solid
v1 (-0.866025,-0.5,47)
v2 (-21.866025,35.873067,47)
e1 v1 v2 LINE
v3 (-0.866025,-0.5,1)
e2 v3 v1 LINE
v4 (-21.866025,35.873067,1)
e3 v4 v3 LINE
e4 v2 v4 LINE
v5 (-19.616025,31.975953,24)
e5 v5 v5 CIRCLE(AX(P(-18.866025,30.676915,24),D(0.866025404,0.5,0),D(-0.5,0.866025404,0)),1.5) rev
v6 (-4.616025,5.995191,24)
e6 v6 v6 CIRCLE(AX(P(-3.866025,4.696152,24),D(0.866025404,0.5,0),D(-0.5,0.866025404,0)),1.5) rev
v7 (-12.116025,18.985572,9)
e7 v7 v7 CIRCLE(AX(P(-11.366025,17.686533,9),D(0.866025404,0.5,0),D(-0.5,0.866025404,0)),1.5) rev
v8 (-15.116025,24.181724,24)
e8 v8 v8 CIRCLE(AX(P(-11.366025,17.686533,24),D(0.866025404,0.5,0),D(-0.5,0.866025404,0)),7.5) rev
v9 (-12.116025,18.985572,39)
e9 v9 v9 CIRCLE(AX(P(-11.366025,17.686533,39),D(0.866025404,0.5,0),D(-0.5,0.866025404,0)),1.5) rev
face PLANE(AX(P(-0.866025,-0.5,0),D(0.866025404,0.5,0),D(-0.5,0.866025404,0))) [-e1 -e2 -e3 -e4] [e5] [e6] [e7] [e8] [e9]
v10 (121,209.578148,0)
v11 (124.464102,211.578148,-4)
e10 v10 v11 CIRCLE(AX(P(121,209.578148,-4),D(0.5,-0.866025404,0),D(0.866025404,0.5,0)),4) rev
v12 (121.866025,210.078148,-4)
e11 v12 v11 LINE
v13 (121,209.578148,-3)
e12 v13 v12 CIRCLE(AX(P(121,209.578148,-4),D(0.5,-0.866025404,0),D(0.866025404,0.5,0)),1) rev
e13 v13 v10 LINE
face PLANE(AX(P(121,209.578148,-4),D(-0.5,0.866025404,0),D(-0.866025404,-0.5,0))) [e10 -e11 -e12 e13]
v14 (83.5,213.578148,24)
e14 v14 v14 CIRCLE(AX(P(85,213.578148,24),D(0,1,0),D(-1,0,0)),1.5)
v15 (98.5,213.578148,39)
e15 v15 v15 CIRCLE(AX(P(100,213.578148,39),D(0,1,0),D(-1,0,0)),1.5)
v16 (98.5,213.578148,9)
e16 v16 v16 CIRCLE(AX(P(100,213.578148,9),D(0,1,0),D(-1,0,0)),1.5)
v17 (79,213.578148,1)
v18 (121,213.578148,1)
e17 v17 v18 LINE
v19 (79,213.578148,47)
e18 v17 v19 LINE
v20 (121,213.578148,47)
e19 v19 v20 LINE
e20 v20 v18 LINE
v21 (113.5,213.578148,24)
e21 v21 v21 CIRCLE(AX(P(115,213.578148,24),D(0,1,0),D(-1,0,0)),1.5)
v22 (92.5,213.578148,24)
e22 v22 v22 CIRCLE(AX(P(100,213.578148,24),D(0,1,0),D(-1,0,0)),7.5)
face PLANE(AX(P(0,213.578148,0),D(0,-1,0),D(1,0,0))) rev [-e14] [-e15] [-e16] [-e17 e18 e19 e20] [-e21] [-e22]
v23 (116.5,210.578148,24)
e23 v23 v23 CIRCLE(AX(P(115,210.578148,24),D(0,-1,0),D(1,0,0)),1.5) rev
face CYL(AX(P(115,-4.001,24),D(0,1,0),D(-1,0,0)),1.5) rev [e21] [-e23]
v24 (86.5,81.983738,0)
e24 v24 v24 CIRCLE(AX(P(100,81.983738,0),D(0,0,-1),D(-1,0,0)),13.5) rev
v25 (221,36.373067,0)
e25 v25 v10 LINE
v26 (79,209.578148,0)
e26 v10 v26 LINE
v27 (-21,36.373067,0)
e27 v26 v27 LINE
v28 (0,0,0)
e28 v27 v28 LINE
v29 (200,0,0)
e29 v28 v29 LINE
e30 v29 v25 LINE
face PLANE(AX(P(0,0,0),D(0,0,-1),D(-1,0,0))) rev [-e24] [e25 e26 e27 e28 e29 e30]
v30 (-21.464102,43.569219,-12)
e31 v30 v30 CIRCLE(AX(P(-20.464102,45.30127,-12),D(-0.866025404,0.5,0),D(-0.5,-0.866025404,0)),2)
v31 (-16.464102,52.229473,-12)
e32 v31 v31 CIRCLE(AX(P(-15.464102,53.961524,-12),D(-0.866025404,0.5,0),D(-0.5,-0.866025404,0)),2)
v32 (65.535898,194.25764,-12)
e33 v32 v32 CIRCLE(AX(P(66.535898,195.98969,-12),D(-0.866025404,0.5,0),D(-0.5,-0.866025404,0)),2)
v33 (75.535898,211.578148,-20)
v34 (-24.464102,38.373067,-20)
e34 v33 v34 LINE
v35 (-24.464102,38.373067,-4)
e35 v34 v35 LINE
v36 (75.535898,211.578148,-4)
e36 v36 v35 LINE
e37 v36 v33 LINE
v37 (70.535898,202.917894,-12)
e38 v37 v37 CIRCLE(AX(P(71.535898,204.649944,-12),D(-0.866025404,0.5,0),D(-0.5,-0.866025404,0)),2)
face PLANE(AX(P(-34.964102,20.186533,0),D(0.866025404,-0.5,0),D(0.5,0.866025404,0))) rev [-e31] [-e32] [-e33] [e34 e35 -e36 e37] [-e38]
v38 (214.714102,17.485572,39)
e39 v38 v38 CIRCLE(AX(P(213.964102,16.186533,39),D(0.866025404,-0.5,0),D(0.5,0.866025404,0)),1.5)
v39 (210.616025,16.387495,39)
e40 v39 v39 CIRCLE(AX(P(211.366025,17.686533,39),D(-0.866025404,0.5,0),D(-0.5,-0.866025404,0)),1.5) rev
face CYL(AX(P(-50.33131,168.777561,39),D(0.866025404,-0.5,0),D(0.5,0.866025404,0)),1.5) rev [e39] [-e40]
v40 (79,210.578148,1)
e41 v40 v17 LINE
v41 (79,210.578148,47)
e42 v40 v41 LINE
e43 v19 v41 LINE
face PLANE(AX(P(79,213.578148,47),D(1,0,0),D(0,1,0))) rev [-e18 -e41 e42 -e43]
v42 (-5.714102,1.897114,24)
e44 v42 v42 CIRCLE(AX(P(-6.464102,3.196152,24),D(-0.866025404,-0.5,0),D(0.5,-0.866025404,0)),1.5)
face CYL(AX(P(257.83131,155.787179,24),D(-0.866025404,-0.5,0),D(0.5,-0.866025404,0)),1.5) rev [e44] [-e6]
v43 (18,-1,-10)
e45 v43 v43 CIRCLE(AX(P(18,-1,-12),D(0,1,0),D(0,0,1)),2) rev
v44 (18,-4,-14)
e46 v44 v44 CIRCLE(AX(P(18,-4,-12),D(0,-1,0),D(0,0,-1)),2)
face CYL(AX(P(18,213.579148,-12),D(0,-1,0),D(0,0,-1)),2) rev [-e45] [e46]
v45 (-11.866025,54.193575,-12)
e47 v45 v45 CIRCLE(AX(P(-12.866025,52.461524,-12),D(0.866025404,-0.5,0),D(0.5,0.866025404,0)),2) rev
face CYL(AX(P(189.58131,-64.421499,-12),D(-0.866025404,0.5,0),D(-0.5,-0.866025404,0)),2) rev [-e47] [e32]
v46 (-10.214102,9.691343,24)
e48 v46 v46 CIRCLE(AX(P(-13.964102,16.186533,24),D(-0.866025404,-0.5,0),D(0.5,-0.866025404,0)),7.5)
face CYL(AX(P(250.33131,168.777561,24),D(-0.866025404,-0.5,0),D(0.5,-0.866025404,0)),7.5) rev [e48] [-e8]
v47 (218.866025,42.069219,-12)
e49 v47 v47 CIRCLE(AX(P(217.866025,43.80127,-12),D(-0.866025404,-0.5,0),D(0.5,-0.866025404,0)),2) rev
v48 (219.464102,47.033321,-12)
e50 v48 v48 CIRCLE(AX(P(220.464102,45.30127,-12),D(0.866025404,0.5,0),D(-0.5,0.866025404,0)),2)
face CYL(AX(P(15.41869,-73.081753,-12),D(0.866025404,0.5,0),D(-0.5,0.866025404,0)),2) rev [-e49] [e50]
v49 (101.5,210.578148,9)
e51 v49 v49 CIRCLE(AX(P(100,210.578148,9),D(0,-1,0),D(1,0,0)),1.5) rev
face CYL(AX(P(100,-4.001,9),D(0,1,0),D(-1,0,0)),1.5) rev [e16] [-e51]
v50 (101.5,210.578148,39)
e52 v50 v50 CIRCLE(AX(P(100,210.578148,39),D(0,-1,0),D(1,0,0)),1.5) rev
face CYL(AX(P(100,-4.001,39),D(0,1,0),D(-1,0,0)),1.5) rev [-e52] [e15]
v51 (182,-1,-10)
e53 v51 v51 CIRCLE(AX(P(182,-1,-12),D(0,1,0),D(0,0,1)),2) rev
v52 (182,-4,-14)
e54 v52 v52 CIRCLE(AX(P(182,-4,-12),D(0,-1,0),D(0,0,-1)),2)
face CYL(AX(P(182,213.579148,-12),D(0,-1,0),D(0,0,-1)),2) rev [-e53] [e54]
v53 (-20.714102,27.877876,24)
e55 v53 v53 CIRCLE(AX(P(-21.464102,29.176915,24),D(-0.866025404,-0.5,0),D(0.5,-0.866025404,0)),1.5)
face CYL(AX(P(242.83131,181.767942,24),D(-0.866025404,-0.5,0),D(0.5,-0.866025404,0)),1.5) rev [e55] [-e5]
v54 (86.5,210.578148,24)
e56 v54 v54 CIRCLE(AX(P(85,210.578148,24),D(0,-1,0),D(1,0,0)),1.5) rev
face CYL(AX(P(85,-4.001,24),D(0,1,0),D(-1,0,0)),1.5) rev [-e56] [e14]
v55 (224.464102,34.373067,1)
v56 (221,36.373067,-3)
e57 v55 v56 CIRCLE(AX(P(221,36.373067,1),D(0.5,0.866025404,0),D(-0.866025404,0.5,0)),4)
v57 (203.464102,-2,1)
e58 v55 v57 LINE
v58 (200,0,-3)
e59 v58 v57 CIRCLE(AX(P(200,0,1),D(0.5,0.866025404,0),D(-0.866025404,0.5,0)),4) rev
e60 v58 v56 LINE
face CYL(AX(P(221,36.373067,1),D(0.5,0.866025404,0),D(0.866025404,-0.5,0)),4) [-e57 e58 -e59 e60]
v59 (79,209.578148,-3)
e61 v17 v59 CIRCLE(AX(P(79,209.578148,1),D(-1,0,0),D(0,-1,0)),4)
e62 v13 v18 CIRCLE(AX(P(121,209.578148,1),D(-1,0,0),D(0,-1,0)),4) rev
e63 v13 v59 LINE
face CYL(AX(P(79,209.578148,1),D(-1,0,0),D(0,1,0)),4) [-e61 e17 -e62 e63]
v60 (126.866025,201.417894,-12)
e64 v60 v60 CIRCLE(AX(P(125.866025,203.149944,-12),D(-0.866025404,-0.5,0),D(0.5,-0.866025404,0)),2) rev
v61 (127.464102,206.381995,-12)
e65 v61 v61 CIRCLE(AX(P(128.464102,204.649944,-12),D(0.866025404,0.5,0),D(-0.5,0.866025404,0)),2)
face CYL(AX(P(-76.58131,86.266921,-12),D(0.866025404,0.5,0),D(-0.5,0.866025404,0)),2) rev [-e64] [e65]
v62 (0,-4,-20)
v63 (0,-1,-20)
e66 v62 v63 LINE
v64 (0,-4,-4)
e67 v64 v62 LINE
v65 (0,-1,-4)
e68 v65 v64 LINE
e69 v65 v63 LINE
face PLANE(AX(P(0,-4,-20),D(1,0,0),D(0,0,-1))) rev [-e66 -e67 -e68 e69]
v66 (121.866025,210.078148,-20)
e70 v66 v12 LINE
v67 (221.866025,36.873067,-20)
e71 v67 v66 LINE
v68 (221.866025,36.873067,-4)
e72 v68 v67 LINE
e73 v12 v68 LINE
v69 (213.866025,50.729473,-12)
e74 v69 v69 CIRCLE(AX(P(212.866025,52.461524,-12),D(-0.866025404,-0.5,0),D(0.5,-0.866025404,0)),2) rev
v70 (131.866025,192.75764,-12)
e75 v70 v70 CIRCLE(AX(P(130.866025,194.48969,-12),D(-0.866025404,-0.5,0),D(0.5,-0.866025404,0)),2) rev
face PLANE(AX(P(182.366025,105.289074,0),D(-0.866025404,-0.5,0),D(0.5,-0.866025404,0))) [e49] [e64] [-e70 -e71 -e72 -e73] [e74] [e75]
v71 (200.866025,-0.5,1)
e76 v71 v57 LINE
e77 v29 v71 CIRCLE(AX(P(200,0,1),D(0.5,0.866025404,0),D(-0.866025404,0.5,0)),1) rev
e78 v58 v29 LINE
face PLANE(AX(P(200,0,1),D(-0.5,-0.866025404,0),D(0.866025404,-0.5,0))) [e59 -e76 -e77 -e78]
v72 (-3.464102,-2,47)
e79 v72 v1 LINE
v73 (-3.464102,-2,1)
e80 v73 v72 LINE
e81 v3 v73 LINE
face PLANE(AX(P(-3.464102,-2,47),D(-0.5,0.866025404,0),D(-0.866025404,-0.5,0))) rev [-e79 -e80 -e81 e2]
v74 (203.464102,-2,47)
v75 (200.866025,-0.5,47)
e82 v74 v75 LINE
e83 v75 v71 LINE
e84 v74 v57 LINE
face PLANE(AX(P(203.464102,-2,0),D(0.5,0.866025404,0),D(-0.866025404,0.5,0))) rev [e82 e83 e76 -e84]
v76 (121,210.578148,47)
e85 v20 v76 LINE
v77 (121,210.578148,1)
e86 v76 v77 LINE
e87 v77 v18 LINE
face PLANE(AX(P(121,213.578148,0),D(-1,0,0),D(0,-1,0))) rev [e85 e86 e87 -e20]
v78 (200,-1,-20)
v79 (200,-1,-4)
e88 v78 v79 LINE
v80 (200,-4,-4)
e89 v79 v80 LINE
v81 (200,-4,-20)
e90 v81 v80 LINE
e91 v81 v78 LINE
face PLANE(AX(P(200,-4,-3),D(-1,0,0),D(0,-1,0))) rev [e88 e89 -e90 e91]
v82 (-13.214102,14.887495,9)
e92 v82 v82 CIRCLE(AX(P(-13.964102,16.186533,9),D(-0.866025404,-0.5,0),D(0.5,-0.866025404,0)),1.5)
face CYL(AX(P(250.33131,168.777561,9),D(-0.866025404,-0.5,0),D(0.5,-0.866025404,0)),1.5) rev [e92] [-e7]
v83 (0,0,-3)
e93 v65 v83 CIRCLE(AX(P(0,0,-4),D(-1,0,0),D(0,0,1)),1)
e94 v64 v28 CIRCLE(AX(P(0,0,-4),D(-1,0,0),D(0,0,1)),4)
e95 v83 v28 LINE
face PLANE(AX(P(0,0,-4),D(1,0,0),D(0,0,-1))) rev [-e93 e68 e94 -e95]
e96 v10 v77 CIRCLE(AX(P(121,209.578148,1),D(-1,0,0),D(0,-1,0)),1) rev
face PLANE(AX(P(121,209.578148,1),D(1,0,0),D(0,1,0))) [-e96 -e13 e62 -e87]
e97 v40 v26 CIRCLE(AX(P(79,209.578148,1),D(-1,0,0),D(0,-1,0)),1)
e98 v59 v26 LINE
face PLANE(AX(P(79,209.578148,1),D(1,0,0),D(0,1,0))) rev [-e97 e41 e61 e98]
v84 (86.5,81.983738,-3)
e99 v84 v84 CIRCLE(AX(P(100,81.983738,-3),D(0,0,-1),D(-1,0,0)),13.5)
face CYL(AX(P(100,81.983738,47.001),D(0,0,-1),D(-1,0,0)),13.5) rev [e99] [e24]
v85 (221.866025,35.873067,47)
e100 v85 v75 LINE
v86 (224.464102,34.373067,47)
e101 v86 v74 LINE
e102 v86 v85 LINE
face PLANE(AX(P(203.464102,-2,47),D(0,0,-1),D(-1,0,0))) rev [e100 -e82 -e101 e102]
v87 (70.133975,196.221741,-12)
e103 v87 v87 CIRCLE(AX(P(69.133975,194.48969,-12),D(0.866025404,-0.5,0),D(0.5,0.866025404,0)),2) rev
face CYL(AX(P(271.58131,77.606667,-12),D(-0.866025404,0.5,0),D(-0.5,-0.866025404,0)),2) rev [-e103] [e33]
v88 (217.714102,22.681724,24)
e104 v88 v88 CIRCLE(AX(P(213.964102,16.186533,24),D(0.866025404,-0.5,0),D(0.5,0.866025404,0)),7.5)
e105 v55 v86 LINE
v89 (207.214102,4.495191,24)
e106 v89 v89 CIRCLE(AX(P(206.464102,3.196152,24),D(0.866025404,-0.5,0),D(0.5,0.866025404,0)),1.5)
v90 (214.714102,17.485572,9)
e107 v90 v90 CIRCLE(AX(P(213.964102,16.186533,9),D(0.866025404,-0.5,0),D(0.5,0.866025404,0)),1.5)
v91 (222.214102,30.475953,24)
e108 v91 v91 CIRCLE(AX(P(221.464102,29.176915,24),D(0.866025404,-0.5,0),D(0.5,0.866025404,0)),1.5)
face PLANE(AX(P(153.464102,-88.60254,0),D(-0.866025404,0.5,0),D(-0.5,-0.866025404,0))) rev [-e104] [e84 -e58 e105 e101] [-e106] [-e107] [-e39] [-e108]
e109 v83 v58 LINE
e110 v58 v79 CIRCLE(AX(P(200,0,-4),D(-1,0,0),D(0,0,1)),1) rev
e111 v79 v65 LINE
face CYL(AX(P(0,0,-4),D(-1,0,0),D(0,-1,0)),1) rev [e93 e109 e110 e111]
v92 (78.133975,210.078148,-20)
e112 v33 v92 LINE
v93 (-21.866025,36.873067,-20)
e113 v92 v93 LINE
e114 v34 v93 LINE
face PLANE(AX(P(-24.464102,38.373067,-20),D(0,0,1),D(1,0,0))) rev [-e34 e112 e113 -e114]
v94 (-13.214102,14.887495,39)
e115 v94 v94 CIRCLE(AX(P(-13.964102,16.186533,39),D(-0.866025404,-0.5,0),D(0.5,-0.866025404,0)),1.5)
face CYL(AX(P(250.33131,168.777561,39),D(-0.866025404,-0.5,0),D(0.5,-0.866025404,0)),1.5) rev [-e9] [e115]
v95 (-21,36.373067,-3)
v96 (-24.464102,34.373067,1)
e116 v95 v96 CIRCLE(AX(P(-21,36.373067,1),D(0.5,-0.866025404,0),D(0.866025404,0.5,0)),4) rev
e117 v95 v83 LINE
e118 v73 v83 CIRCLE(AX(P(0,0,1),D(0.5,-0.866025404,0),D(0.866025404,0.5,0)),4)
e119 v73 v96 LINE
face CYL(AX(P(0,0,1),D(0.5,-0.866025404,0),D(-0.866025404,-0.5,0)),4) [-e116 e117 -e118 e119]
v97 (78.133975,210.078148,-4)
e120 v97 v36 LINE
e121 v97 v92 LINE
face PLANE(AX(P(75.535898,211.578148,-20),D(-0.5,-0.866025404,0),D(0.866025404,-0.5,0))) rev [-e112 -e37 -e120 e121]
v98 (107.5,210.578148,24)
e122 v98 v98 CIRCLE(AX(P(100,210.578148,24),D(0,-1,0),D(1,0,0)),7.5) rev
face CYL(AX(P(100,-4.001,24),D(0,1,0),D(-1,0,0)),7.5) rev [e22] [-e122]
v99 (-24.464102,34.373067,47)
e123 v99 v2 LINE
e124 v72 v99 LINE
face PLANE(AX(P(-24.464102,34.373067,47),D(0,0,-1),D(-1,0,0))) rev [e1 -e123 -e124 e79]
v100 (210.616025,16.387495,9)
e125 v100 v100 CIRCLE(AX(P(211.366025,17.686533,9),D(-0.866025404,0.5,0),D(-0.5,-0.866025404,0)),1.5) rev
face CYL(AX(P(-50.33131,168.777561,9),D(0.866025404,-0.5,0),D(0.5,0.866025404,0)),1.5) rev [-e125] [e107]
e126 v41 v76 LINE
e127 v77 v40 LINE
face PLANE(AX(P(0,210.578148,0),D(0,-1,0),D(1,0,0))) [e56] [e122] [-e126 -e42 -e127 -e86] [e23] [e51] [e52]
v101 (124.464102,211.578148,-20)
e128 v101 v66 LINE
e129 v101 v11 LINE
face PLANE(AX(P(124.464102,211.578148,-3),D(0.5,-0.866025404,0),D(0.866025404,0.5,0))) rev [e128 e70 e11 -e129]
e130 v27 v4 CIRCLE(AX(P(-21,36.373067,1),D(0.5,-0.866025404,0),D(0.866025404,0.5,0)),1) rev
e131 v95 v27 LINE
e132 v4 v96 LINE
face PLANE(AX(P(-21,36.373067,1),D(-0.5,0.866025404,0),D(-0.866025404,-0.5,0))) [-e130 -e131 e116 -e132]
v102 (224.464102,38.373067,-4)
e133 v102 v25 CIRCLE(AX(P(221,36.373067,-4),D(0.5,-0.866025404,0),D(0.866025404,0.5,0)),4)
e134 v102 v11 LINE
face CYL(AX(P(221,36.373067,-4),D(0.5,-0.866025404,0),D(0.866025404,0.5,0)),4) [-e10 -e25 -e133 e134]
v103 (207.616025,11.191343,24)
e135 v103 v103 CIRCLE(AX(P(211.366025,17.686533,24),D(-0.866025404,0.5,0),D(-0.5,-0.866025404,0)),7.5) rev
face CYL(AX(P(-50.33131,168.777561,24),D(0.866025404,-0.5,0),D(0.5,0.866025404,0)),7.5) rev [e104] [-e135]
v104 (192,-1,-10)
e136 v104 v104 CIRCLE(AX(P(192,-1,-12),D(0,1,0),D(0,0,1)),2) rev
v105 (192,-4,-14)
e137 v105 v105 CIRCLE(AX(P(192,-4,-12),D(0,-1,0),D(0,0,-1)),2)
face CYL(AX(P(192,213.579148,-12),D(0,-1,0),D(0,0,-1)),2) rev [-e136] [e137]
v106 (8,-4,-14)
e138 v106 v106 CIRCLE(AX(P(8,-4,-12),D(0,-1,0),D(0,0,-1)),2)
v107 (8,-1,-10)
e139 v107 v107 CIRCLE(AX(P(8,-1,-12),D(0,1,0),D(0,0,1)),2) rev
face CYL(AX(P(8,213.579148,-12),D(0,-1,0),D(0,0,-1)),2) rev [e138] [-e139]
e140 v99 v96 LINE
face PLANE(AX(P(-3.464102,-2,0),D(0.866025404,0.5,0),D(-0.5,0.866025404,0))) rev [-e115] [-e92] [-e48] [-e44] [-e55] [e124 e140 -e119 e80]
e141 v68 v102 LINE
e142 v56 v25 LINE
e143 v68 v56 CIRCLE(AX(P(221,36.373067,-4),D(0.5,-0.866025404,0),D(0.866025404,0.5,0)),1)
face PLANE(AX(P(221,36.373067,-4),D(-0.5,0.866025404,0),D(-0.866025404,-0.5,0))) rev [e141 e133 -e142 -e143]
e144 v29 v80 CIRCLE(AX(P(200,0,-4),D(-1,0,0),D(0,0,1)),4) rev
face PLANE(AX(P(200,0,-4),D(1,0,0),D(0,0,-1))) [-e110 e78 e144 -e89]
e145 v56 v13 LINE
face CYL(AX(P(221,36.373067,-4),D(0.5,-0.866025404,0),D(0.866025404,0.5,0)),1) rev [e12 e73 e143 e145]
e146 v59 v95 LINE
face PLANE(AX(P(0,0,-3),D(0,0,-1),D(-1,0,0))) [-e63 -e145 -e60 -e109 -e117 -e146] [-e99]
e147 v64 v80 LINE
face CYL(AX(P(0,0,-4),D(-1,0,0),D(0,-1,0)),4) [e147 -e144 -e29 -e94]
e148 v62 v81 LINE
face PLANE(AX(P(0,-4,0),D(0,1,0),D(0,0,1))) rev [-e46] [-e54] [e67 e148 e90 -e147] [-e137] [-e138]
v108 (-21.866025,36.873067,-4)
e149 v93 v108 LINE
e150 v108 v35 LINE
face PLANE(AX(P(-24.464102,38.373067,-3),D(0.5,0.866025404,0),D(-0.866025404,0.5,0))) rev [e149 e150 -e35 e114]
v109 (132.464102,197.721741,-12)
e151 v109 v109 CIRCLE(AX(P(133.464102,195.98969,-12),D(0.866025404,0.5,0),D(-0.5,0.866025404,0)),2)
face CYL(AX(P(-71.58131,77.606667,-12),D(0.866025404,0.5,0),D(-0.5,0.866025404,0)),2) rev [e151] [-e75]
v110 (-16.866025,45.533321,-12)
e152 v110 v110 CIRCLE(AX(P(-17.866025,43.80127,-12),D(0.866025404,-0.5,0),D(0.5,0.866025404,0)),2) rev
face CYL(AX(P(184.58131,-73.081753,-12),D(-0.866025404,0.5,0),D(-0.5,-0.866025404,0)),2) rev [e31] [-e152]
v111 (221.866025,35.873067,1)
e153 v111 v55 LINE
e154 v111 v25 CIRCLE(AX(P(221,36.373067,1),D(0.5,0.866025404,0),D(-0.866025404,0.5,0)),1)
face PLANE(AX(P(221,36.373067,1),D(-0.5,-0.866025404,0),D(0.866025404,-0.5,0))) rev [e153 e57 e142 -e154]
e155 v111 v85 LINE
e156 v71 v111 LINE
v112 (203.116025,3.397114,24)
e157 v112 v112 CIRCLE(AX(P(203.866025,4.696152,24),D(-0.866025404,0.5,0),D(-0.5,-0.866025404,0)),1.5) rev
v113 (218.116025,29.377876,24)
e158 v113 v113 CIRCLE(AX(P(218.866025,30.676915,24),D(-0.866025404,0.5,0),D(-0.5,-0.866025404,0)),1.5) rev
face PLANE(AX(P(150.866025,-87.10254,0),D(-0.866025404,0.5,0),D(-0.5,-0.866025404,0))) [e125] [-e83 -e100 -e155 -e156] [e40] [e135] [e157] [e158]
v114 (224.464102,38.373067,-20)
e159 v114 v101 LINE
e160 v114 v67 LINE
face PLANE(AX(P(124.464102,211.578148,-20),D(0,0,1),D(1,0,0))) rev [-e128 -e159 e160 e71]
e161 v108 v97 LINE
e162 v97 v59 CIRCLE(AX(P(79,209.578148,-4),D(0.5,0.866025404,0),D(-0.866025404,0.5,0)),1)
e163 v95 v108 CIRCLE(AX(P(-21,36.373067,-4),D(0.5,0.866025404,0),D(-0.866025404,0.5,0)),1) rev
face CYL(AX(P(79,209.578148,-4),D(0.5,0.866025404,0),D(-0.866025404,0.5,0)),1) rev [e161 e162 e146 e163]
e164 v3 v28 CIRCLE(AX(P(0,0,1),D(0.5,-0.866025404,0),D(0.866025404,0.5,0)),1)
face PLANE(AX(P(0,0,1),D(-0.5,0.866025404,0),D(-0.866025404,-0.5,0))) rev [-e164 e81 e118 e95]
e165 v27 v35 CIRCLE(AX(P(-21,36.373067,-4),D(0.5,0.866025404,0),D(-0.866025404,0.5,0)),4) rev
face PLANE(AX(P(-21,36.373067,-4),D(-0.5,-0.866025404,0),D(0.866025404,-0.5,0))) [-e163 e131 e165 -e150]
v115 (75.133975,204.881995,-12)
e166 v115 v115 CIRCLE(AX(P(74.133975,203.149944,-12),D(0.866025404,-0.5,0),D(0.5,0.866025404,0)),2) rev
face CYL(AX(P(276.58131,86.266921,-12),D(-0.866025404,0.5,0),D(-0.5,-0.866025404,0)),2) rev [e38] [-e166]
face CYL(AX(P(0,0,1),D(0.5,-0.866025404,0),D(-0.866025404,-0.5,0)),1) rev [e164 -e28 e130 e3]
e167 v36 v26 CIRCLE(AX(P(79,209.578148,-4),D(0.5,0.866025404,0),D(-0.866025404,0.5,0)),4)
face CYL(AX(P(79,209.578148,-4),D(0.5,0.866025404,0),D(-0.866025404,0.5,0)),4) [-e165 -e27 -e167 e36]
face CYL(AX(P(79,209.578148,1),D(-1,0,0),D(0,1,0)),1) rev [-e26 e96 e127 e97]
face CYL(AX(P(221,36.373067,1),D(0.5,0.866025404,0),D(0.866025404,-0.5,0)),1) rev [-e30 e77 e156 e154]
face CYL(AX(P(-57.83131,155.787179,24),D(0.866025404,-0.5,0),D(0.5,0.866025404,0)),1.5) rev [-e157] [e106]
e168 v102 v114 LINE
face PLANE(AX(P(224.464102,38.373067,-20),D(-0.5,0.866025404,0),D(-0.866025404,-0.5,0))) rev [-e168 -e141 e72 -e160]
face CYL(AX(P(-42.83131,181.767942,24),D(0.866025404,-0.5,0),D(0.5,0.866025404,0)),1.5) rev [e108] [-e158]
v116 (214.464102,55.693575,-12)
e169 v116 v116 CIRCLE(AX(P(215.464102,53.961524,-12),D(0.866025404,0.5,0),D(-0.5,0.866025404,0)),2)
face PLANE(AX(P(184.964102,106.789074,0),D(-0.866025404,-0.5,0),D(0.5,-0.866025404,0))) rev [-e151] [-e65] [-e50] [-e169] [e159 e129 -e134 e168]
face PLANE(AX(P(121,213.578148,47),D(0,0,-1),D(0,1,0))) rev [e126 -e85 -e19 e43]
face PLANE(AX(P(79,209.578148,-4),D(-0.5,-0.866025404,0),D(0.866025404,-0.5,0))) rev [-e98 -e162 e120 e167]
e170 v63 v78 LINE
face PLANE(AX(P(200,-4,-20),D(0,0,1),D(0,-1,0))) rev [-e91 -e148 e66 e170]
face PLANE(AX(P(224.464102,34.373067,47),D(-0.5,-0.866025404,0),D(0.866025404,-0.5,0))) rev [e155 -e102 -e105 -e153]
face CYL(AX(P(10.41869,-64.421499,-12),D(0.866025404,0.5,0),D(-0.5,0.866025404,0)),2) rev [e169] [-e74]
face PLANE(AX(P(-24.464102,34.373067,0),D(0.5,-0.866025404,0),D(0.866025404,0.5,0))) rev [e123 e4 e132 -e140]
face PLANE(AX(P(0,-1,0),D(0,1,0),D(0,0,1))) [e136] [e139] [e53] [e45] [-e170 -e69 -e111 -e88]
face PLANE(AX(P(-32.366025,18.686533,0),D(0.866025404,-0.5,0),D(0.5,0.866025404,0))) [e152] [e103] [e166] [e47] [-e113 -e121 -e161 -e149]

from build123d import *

# Parameters (mm, degrees)
SM_BASE_FLANGE_3_DEPTH        = 3
SM_EDGE_FLANGE_2_DEPTH        = 42
SM_EDGE_FLANGE_2_BEND_DEPTH   = 42
SM_EDGE_FLANGE_2_BEND_2_DEPTH = 42
SM_EDGE_FLANGE_6_DEPTH        = 200
SM_EDGE_FLANGE_6_BEND_DEPTH   = 200
SM_EDGE_FLANGE_6_BEND_2_DEPTH = 200
CUT_EXTRUDE_3_REACH           = 318.122
SKETCH_42_R                   = 7.5
SKETCH_42_R_2                 = 1.5
CUT_EXTRUDE_2_REACH           = 355.809
SKETCH_43_R                   = 7.5
SKETCH_43_R_2                 = 1.5
CUT_EXTRUDE_1_REACH           = 319.229
SKETCH_44_R                   = 7.5
SKETCH_44_R_2                 = 1.5
CUT_EXTRUDE_4_REACH           = 328.974
SKETCH_47_R                   = 2
CUT_EXTRUDE_6_REACH           = 243.544
SKETCH_50_R                   = 2
CUT_EXTRUDE_7_REACH           = 318.122
SKETCH_51_R                   = 2
CUT_EXTRUDE_8_REACH           = 315.847
SKETCH_52_R                   = 13.5


# Sheet-metal steps are written as plain solids
with BuildPart() as part:
    # Эскиз10 → Базовая кромка3 (new body)
    with BuildSketch(Plane.XY):
        Polygon((0, 0), (-21, 36.373066959), (79, 209.578147716), (121, 209.578147716), (221, 36.373066959), (200, 0), align=None)
    extrude(amount=-SM_BASE_FLANGE_3_DEPTH)

    # Ребро-кромка2 section (across the edge) → Ребро-кромка2 (add)
    with BuildSketch(Plane(origin=(121, 210.578147716, 0), x_dir=(0, -1, 0), z_dir=(-1, 0, 0))):
        with BuildLine():
            Line((-3, 1), (-3, 47))
            Line((-3, 47), (0, 47))
            Line((0, 47), (0, 1))
            ThreePointArc((0, 1), (0.292893219, 0.292893219), (1, 0))
            Line((1, 0), (1, -3))
            ThreePointArc((1, -3), (-1.828427125, -1.828427125), (-3, 1))
        make_face()
    extrude(amount=SM_EDGE_FLANGE_2_DEPTH)

    # Ребро-кромка2 section 2 (across the edge) → Ребро-кромка2 bend (add)
    with BuildSketch(Plane(origin=(-21.866025404, 35.873066959, 0), x_dir=(0.8660254037844359, 0.5000000000000049, 3.4914813388431326e-15), z_dir=(0.5000000000000049, -0.8660254037844359, 0))):
        with BuildLine():
            Line((-3, 1), (-3, 47))
            Line((-3, 47), (0, 47))
            Line((0, 47), (0, 1))
            ThreePointArc((0, 1), (0.292893219, 0.292893219), (1, 0))
            Line((1, 0), (1, -3))
            ThreePointArc((1, -3), (-1.828427125, -1.828427125), (-3, 1))
        make_face()
    extrude(amount=SM_EDGE_FLANGE_2_BEND_DEPTH)

    # Ребро-кромка2 section 3 (across the edge) → Ребро-кромка2 bend 2 (add)
    with BuildSketch(Plane(origin=(200.866025404, -0.5, 0), x_dir=(-0.8660254037844527, 0.49999999999997596, 3.4914813388431334e-15), z_dir=(0.49999999999997596, 0.8660254037844527, 0))):
        with BuildLine():
            Line((-3, 1), (-3, 47))
            Line((-3, 47), (0, 47))
            Line((0, 47), (0, 1))
            ThreePointArc((0, 1), (0.292893219, 0.292893219), (1, 0))
            Line((1, 0), (1, -3))
            ThreePointArc((1, -3), (-1.828427125, -1.828427125), (-3, 1))
        make_face()
    extrude(amount=SM_EDGE_FLANGE_2_BEND_2_DEPTH)

    # Ребро-кромка6 section (across the edge) → Ребро-кромка6 (add)
    with BuildSketch(Plane(origin=(-21.866025404, 36.873066959, -3), x_dir=(0.8660254037844431, -0.4999999999999925, -3.4914813388431334e-15), z_dir=(0.4999999999999925, 0.8660254037844431, 0))):
        with BuildLine():
            Line((-3, 1), (-3, 17))
            Line((-3, 17), (0, 17))
            Line((0, 17), (0, 1))
            ThreePointArc((0, 1), (0.292893219, 0.292893219), (1, 0))
            Line((1, 0), (1, -3))
            ThreePointArc((1, -3), (-1.828427125, -1.828427125), (-3, 1))
        make_face()
    extrude(amount=SM_EDGE_FLANGE_6_DEPTH)

    # Ребро-кромка6 section 2 (across the edge) → Ребро-кромка6 bend (add)
    with BuildSketch(Plane(origin=(121.866025404, 210.078147716, -3), x_dir=(-0.8660254037844359, -0.5000000000000047, -3.4914813388431334e-15), z_dir=(0.5000000000000047, -0.8660254037844359, 0))):
        with BuildLine():
            Line((-3, 1), (-3, 17))
            Line((-3, 17), (0, 17))
            Line((0, 17), (0, 1))
            ThreePointArc((0, 1), (0.292893219, 0.292893219), (1, 0))
            Line((1, 0), (1, -3))
            ThreePointArc((1, -3), (-1.828427125, -1.828427125), (-3, 1))
        make_face()
    extrude(amount=SM_EDGE_FLANGE_6_BEND_DEPTH)

    # Ребро-кромка6 section 3 (across the edge) → Ребро-кромка6 bend 2 (add)
    with BuildSketch(Plane(origin=(200, -1, -3), x_dir=(0, 1, 0), z_dir=(-1, 0, 0))):
        with BuildLine():
            Line((-3, 1), (-3, 17))
            Line((-3, 17), (0, 17))
            Line((0, 17), (0, 1))
            ThreePointArc((0, 1), (0.292893219, 0.292893219), (1, 0))
            Line((1, 0), (1, -3))
            ThreePointArc((1, -3), (-1.828427125, -1.828427125), (-3, 1))
        make_face()
    extrude(amount=SM_EDGE_FLANGE_6_BEND_2_DEPTH)

    # Эскиз42 → Вырез-Вытянуть3 (cut, up to next)
    with BuildSketch(Plane(origin=(0, 213.578147716, 0), x_dir=(1, 0, 0), z_dir=(0, 1, 0)), mode=Mode.PRIVATE) as cut_extrude_3_sk1:
        with Locations(Location((100, -24, 0), (0, 0, 180))):
            Circle(SKETCH_42_R)
    cut_extrude_3_tool1 = extrude(cut_extrude_3_sk1.sketch, amount=-CUT_EXTRUDE_3_REACH, mode=Mode.PRIVATE) & part.part
    # Эскиз42 → Вырез-Вытянуть3 (cut, up to next)
    with BuildSketch(Plane(origin=(0, 213.578147716, 0), x_dir=(1, 0, 0), z_dir=(0, 1, 0)), mode=Mode.PRIVATE) as cut_extrude_3_sk2:
        with Locations(Location((100, -9, 0), (0, 0, 180))):
            Circle(SKETCH_42_R_2)
    cut_extrude_3_tool2 = extrude(cut_extrude_3_sk2.sketch, amount=-CUT_EXTRUDE_3_REACH, mode=Mode.PRIVATE) & part.part
    # Эскиз42 → Вырез-Вытянуть3 (cut, up to next)
    with BuildSketch(Plane(origin=(0, 213.578147716, 0), x_dir=(1, 0, 0), z_dir=(0, 1, 0)), mode=Mode.PRIVATE) as cut_extrude_3_sk3:
        with Locations(Location((115, -24, 0), (0, 0, 180))):
            Circle(SKETCH_42_R_2)
    cut_extrude_3_tool3 = extrude(cut_extrude_3_sk3.sketch, amount=-CUT_EXTRUDE_3_REACH, mode=Mode.PRIVATE) & part.part
    # Эскиз42 → Вырез-Вытянуть3 (cut, up to next)
    with BuildSketch(Plane(origin=(0, 213.578147716, 0), x_dir=(1, 0, 0), z_dir=(0, 1, 0)), mode=Mode.PRIVATE) as cut_extrude_3_sk4:
        with Locations(Location((100, -39, 0), (0, 0, 180))):
            Circle(SKETCH_42_R_2)
    cut_extrude_3_tool4 = extrude(cut_extrude_3_sk4.sketch, amount=-CUT_EXTRUDE_3_REACH, mode=Mode.PRIVATE) & part.part
    # Эскиз42 → Вырез-Вытянуть3 (cut, up to next)
    with BuildSketch(Plane(origin=(0, 213.578147716, 0), x_dir=(1, 0, 0), z_dir=(0, 1, 0)), mode=Mode.PRIVATE) as cut_extrude_3_sk5:
        with Locations(Location((85, -24, 0), (0, 0, 180))):
            Circle(SKETCH_42_R_2)
    cut_extrude_3_tool5 = extrude(cut_extrude_3_sk5.sketch, amount=-CUT_EXTRUDE_3_REACH, mode=Mode.PRIVATE) & part.part
    add(cut_extrude_3_tool1.solids().sort_by_distance((100, 213.578148, 24))[0], mode=Mode.SUBTRACT)
    add(cut_extrude_3_tool2.solids().sort_by_distance((100, 213.578148, 9))[0], mode=Mode.SUBTRACT)
    add(cut_extrude_3_tool3.solids().sort_by_distance((115, 213.578148, 24))[0], mode=Mode.SUBTRACT)
    add(cut_extrude_3_tool4.solids().sort_by_distance((100, 213.578148, 39))[0], mode=Mode.SUBTRACT)
    add(cut_extrude_3_tool5.solids().sort_by_distance((85, 213.578148, 24))[0], mode=Mode.SUBTRACT)

    # Эскиз43 → Вырез-Вытянуть2 (cut, up to next)
    with BuildSketch(Plane(origin=(153.464101615, -88.602540378, 0), x_dir=(0, 0, -1), z_dir=(0.8660254037844525, -0.4999999999999761, -3.3549385599670306e-15)), mode=Mode.PRIVATE) as cut_extrude_2_sk1:
        with Locations(Location((-24, 121, 0), (0, 0, 90))):
            Circle(SKETCH_43_R)
    cut_extrude_2_tool1 = extrude(cut_extrude_2_sk1.sketch, amount=-CUT_EXTRUDE_2_REACH, mode=Mode.PRIVATE) & part.part
    # Эскиз43 → Вырез-Вытянуть2 (cut, up to next)
    with BuildSketch(Plane(origin=(153.464101615, -88.602540378, 0), x_dir=(0, 0, -1), z_dir=(0.8660254037844525, -0.4999999999999761, -3.3549385599670306e-15)), mode=Mode.PRIVATE) as cut_extrude_2_sk2:
        with Locations(Location((-24, 136, 0), (0, 0, 90))):
            Circle(SKETCH_43_R_2)
    cut_extrude_2_tool2 = extrude(cut_extrude_2_sk2.sketch, amount=-CUT_EXTRUDE_2_REACH, mode=Mode.PRIVATE) & part.part
    # Эскиз43 → Вырез-Вытянуть2 (cut, up to next)
    with BuildSketch(Plane(origin=(153.464101615, -88.602540378, 0), x_dir=(0, 0, -1), z_dir=(0.8660254037844525, -0.4999999999999761, -3.3549385599670306e-15)), mode=Mode.PRIVATE) as cut_extrude_2_sk3:
        with Locations(Location((-9, 121, 0), (0, 0, 90))):
            Circle(SKETCH_43_R_2)
    cut_extrude_2_tool3 = extrude(cut_extrude_2_sk3.sketch, amount=-CUT_EXTRUDE_2_REACH, mode=Mode.PRIVATE) & part.part
    # Эскиз43 → Вырез-Вытянуть2 (cut, up to next)
    with BuildSketch(Plane(origin=(153.464101615, -88.602540378, 0), x_dir=(0, 0, -1), z_dir=(0.8660254037844525, -0.4999999999999761, -3.3549385599670306e-15)), mode=Mode.PRIVATE) as cut_extrude_2_sk4:
        with Locations(Location((-24, 106, 0), (0, 0, 90))):
            Circle(SKETCH_43_R_2)
    cut_extrude_2_tool4 = extrude(cut_extrude_2_sk4.sketch, amount=-CUT_EXTRUDE_2_REACH, mode=Mode.PRIVATE) & part.part
    # Эскиз43 → Вырез-Вытянуть2 (cut, up to next)
    with BuildSketch(Plane(origin=(153.464101615, -88.602540378, 0), x_dir=(0, 0, -1), z_dir=(0.8660254037844525, -0.4999999999999761, -3.3549385599670306e-15)), mode=Mode.PRIVATE) as cut_extrude_2_sk5:
        with Locations(Location((-39, 121, 0), (0, 0, 90))):
            Circle(SKETCH_43_R_2)
    cut_extrude_2_tool5 = extrude(cut_extrude_2_sk5.sketch, amount=-CUT_EXTRUDE_2_REACH, mode=Mode.PRIVATE) & part.part
    add(cut_extrude_2_tool1.solids().sort_by_distance((213.964102, 16.186533, 24))[0], mode=Mode.SUBTRACT)
    add(cut_extrude_2_tool2.solids().sort_by_distance((221.464102, 29.176915, 24))[0], mode=Mode.SUBTRACT)
    add(cut_extrude_2_tool3.solids().sort_by_distance((213.964102, 16.186533, 9))[0], mode=Mode.SUBTRACT)
    add(cut_extrude_2_tool4.solids().sort_by_distance((206.464102, 3.196152, 24))[0], mode=Mode.SUBTRACT)
    add(cut_extrude_2_tool5.solids().sort_by_distance((213.964102, 16.186533, 39))[0], mode=Mode.SUBTRACT)

    # Эскиз44 → Вырез-Вытянуть1 (cut, up to next)
    with BuildSketch(Plane(origin=(-3.464101615, -2, 0), x_dir=(0, 0, 1), z_dir=(-0.8660254037844358, -0.500000000000005, -3.509022108555461e-15)), mode=Mode.PRIVATE) as cut_extrude_1_sk1:
        with Locations(Location((24, 21, 0), (0, 0, 270))):
            Circle(SKETCH_44_R)
    cut_extrude_1_tool1 = extrude(cut_extrude_1_sk1.sketch, amount=-CUT_EXTRUDE_1_REACH, mode=Mode.PRIVATE) & part.part
    # Эскиз44 → Вырез-Вытянуть1 (cut, up to next)
    with BuildSketch(Plane(origin=(-3.464101615, -2, 0), x_dir=(0, 0, 1), z_dir=(-0.8660254037844358, -0.500000000000005, -3.509022108555461e-15)), mode=Mode.PRIVATE) as cut_extrude_1_sk2:
        with Locations(Location((24, 36, 0), (0, 0, 270))):
            Circle(SKETCH_44_R_2)
    cut_extrude_1_tool2 = extrude(cut_extrude_1_sk2.sketch, amount=-CUT_EXTRUDE_1_REACH, mode=Mode.PRIVATE) & part.part
    # Эскиз44 → Вырез-Вытянуть1 (cut, up to next)
    with BuildSketch(Plane(origin=(-3.464101615, -2, 0), x_dir=(0, 0, 1), z_dir=(-0.8660254037844358, -0.500000000000005, -3.509022108555461e-15)), mode=Mode.PRIVATE) as cut_extrude_1_sk3:
        with Locations(Location((39, 21, 0), (0, 0, 270))):
            Circle(SKETCH_44_R_2)
    cut_extrude_1_tool3 = extrude(cut_extrude_1_sk3.sketch, amount=-CUT_EXTRUDE_1_REACH, mode=Mode.PRIVATE) & part.part
    # Эскиз44 → Вырез-Вытянуть1 (cut, up to next)
    with BuildSketch(Plane(origin=(-3.464101615, -2, 0), x_dir=(0, 0, 1), z_dir=(-0.8660254037844358, -0.500000000000005, -3.509022108555461e-15)), mode=Mode.PRIVATE) as cut_extrude_1_sk4:
        with Locations(Location((24, 6, 0), (0, 0, 270))):
            Circle(SKETCH_44_R_2)
    cut_extrude_1_tool4 = extrude(cut_extrude_1_sk4.sketch, amount=-CUT_EXTRUDE_1_REACH, mode=Mode.PRIVATE) & part.part
    # Эскиз44 → Вырез-Вытянуть1 (cut, up to next)
    with BuildSketch(Plane(origin=(-3.464101615, -2, 0), x_dir=(0, 0, 1), z_dir=(-0.8660254037844358, -0.500000000000005, -3.509022108555461e-15)), mode=Mode.PRIVATE) as cut_extrude_1_sk5:
        with Locations(Location((9, 21, 0), (0, 0, 270))):
            Circle(SKETCH_44_R_2)
    cut_extrude_1_tool5 = extrude(cut_extrude_1_sk5.sketch, amount=-CUT_EXTRUDE_1_REACH, mode=Mode.PRIVATE) & part.part
    add(cut_extrude_1_tool1.solids().sort_by_distance((-13.964102, 16.186533, 24))[0], mode=Mode.SUBTRACT)
    add(cut_extrude_1_tool2.solids().sort_by_distance((-21.464102, 29.176915, 24))[0], mode=Mode.SUBTRACT)
    add(cut_extrude_1_tool3.solids().sort_by_distance((-13.964102, 16.186533, 39))[0], mode=Mode.SUBTRACT)
    add(cut_extrude_1_tool4.solids().sort_by_distance((-6.464102, 3.196152, 24))[0], mode=Mode.SUBTRACT)
    add(cut_extrude_1_tool5.solids().sort_by_distance((-13.964102, 16.186533, 9))[0], mode=Mode.SUBTRACT)

    # Эскиз47 → Вырез-Вытянуть4 (cut, up to next)
    with BuildSketch(Plane(origin=(-34.964101615, 20.186533479, 0), x_dir=(0, 0, 1), z_dir=(-0.866025403784443, 0.4999999999999925, 3.788649256556814e-15)), mode=Mode.PRIVATE) as cut_extrude_4_sk1:
        with Locations(Location((-12, 29, 0), (0, 0, 270))):
            Circle(SKETCH_47_R)
    cut_extrude_4_tool1 = extrude(cut_extrude_4_sk1.sketch, amount=-CUT_EXTRUDE_4_REACH, mode=Mode.PRIVATE) & part.part
    # Эскиз47 → Вырез-Вытянуть4 (cut, up to next)
    with BuildSketch(Plane(origin=(-34.964101615, 20.186533479, 0), x_dir=(0, 0, 1), z_dir=(-0.866025403784443, 0.4999999999999925, 3.788649256556814e-15)), mode=Mode.PRIVATE) as cut_extrude_4_sk2:
        with Locations(Location((-12, 39, 0), (0, 0, 270))):
            Circle(SKETCH_47_R)
    cut_extrude_4_tool2 = extrude(cut_extrude_4_sk2.sketch, amount=-CUT_EXTRUDE_4_REACH, mode=Mode.PRIVATE) & part.part
    # Эскиз47 → Вырез-Вытянуть4 (cut, up to next)
    with BuildSketch(Plane(origin=(-34.964101615, 20.186533479, 0), x_dir=(0, 0, 1), z_dir=(-0.866025403784443, 0.4999999999999925, 3.788649256556814e-15)), mode=Mode.PRIVATE) as cut_extrude_4_sk3:
        with Locations(Location((-12, 203, 0), (0, 0, 270))):
            Circle(SKETCH_47_R)
    cut_extrude_4_tool3 = extrude(cut_extrude_4_sk3.sketch, amount=-CUT_EXTRUDE_4_REACH, mode=Mode.PRIVATE) & part.part
    # Эскиз47 → Вырез-Вытянуть4 (cut, up to next)
    with BuildSketch(Plane(origin=(-34.964101615, 20.186533479, 0), x_dir=(0, 0, 1), z_dir=(-0.866025403784443, 0.4999999999999925, 3.788649256556814e-15)), mode=Mode.PRIVATE) as cut_extrude_4_sk4:
        with Locations(Location((-12, 213, 0), (0, 0, 270))):
            Circle(SKETCH_47_R)
    cut_extrude_4_tool4 = extrude(cut_extrude_4_sk4.sketch, amount=-CUT_EXTRUDE_4_REACH, mode=Mode.PRIVATE) & part.part
    add(cut_extrude_4_tool1.solids().sort_by_distance((-20.464102, 45.30127, -12))[0], mode=Mode.SUBTRACT)
    add(cut_extrude_4_tool2.solids().sort_by_distance((-15.464102, 53.961524, -12))[0], mode=Mode.SUBTRACT)
    add(cut_extrude_4_tool3.solids().sort_by_distance((66.535898, 195.98969, -12))[0], mode=Mode.SUBTRACT)
    add(cut_extrude_4_tool4.solids().sort_by_distance((71.535898, 204.649944, -12))[0], mode=Mode.SUBTRACT)

    # Эскиз50 → Вырез-Вытянуть6 (cut, up to next)
    with BuildSketch(Plane(origin=(184.964101615, 106.789073858, 0), x_dir=(0, 0, -1), z_dir=(0.866025403784436, 0.5000000000000047, 3.0623287353932815e-15)), mode=Mode.PRIVATE) as cut_extrude_6_sk1:
        with Locations(Location((12, -71, 0), (0, 0, 90))):
            Circle(SKETCH_50_R)
    cut_extrude_6_tool1 = extrude(cut_extrude_6_sk1.sketch, amount=-CUT_EXTRUDE_6_REACH, mode=Mode.PRIVATE) & part.part
    # Эскиз50 → Вырез-Вытянуть6 (cut, up to next)
    with BuildSketch(Plane(origin=(184.964101615, 106.789073858, 0), x_dir=(0, 0, -1), z_dir=(0.866025403784436, 0.5000000000000047, 3.0623287353932815e-15)), mode=Mode.PRIVATE) as cut_extrude_6_sk2:
        with Locations(Location((12, -61, 0), (0, 0, 90))):
            Circle(SKETCH_50_R)
    cut_extrude_6_tool2 = extrude(cut_extrude_6_sk2.sketch, amount=-CUT_EXTRUDE_6_REACH, mode=Mode.PRIVATE) & part.part
    # Эскиз50 → Вырез-Вытянуть6 (cut, up to next)
    with BuildSketch(Plane(origin=(184.964101615, 106.789073858, 0), x_dir=(0, 0, -1), z_dir=(0.866025403784436, 0.5000000000000047, 3.0623287353932815e-15)), mode=Mode.PRIVATE) as cut_extrude_6_sk3:
        with Locations(Location((12, 103, 0), (0, 0, 90))):
            Circle(SKETCH_50_R)
    cut_extrude_6_tool3 = extrude(cut_extrude_6_sk3.sketch, amount=-CUT_EXTRUDE_6_REACH, mode=Mode.PRIVATE) & part.part
    # Эскиз50 → Вырез-Вытянуть6 (cut, up to next)
    with BuildSketch(Plane(origin=(184.964101615, 106.789073858, 0), x_dir=(0, 0, -1), z_dir=(0.866025403784436, 0.5000000000000047, 3.0623287353932815e-15)), mode=Mode.PRIVATE) as cut_extrude_6_sk4:
        with Locations(Location((12, 113, 0), (0, 0, 90))):
            Circle(SKETCH_50_R)
    cut_extrude_6_tool4 = extrude(cut_extrude_6_sk4.sketch, amount=-CUT_EXTRUDE_6_REACH, mode=Mode.PRIVATE) & part.part
    add(cut_extrude_6_tool1.solids().sort_by_distance((220.464102, 45.30127, -12))[0], mode=Mode.SUBTRACT)
    add(cut_extrude_6_tool2.solids().sort_by_distance((215.464102, 53.961524, -12))[0], mode=Mode.SUBTRACT)
    add(cut_extrude_6_tool3.solids().sort_by_distance((133.464102, 195.98969, -12))[0], mode=Mode.SUBTRACT)
    add(cut_extrude_6_tool4.solids().sort_by_distance((128.464102, 204.649944, -12))[0], mode=Mode.SUBTRACT)

    # Эскиз51 → Вырез-Вытянуть7 (cut, up to next)
    with BuildSketch(Plane.XZ.offset(4), mode=Mode.PRIVATE) as cut_extrude_7_sk1:
        with Locations(Location((192, -12, 0), (0, 0, 270))):
            Circle(SKETCH_51_R)
    cut_extrude_7_tool1 = extrude(cut_extrude_7_sk1.sketch, amount=-CUT_EXTRUDE_7_REACH, mode=Mode.PRIVATE) & part.part
    # Эскиз51 → Вырез-Вытянуть7 (cut, up to next)
    with BuildSketch(Plane.XZ.offset(4), mode=Mode.PRIVATE) as cut_extrude_7_sk2:
        with Locations(Location((182, -12, 0), (0, 0, 270))):
            Circle(SKETCH_51_R)
    cut_extrude_7_tool2 = extrude(cut_extrude_7_sk2.sketch, amount=-CUT_EXTRUDE_7_REACH, mode=Mode.PRIVATE) & part.part
    # Эскиз51 → Вырез-Вытянуть7 (cut, up to next)
    with BuildSketch(Plane.XZ.offset(4), mode=Mode.PRIVATE) as cut_extrude_7_sk3:
        with Locations(Location((18, -12, 0), (0, 0, 270))):
            Circle(SKETCH_51_R)
    cut_extrude_7_tool3 = extrude(cut_extrude_7_sk3.sketch, amount=-CUT_EXTRUDE_7_REACH, mode=Mode.PRIVATE) & part.part
    # Эскиз51 → Вырез-Вытянуть7 (cut, up to next)
    with BuildSketch(Plane.XZ.offset(4), mode=Mode.PRIVATE) as cut_extrude_7_sk4:
        with Locations(Location((8, -12, 0), (0, 0, 270))):
            Circle(SKETCH_51_R)
    cut_extrude_7_tool4 = extrude(cut_extrude_7_sk4.sketch, amount=-CUT_EXTRUDE_7_REACH, mode=Mode.PRIVATE) & part.part
    add(cut_extrude_7_tool1.solids().sort_by_distance((192, -4, -12))[0], mode=Mode.SUBTRACT)
    add(cut_extrude_7_tool2.solids().sort_by_distance((182, -4, -12))[0], mode=Mode.SUBTRACT)
    add(cut_extrude_7_tool3.solids().sort_by_distance((18, -4, -12))[0], mode=Mode.SUBTRACT)
    add(cut_extrude_7_tool4.solids().sort_by_distance((8, -4, -12))[0], mode=Mode.SUBTRACT)

    # Эскиз52 → Вырез-Вытянуть8 (cut, up to next)
    with BuildSketch(Plane(origin=(0, 0, -3), x_dir=(-1, 0, 0), z_dir=(0, 0, -1)), mode=Mode.PRIVATE) as cut_extrude_8_sk1:
        with Locations((-100, 81.983738225)):
            Circle(SKETCH_52_R)
    cut_extrude_8_tool1 = extrude(cut_extrude_8_sk1.sketch, amount=-CUT_EXTRUDE_8_REACH, mode=Mode.PRIVATE) & part.part
    add(cut_extrude_8_tool1.solids().sort_by_distance((100, 81.983738, -3))[0], mode=Mode.SUBTRACT)


solid = part.part
